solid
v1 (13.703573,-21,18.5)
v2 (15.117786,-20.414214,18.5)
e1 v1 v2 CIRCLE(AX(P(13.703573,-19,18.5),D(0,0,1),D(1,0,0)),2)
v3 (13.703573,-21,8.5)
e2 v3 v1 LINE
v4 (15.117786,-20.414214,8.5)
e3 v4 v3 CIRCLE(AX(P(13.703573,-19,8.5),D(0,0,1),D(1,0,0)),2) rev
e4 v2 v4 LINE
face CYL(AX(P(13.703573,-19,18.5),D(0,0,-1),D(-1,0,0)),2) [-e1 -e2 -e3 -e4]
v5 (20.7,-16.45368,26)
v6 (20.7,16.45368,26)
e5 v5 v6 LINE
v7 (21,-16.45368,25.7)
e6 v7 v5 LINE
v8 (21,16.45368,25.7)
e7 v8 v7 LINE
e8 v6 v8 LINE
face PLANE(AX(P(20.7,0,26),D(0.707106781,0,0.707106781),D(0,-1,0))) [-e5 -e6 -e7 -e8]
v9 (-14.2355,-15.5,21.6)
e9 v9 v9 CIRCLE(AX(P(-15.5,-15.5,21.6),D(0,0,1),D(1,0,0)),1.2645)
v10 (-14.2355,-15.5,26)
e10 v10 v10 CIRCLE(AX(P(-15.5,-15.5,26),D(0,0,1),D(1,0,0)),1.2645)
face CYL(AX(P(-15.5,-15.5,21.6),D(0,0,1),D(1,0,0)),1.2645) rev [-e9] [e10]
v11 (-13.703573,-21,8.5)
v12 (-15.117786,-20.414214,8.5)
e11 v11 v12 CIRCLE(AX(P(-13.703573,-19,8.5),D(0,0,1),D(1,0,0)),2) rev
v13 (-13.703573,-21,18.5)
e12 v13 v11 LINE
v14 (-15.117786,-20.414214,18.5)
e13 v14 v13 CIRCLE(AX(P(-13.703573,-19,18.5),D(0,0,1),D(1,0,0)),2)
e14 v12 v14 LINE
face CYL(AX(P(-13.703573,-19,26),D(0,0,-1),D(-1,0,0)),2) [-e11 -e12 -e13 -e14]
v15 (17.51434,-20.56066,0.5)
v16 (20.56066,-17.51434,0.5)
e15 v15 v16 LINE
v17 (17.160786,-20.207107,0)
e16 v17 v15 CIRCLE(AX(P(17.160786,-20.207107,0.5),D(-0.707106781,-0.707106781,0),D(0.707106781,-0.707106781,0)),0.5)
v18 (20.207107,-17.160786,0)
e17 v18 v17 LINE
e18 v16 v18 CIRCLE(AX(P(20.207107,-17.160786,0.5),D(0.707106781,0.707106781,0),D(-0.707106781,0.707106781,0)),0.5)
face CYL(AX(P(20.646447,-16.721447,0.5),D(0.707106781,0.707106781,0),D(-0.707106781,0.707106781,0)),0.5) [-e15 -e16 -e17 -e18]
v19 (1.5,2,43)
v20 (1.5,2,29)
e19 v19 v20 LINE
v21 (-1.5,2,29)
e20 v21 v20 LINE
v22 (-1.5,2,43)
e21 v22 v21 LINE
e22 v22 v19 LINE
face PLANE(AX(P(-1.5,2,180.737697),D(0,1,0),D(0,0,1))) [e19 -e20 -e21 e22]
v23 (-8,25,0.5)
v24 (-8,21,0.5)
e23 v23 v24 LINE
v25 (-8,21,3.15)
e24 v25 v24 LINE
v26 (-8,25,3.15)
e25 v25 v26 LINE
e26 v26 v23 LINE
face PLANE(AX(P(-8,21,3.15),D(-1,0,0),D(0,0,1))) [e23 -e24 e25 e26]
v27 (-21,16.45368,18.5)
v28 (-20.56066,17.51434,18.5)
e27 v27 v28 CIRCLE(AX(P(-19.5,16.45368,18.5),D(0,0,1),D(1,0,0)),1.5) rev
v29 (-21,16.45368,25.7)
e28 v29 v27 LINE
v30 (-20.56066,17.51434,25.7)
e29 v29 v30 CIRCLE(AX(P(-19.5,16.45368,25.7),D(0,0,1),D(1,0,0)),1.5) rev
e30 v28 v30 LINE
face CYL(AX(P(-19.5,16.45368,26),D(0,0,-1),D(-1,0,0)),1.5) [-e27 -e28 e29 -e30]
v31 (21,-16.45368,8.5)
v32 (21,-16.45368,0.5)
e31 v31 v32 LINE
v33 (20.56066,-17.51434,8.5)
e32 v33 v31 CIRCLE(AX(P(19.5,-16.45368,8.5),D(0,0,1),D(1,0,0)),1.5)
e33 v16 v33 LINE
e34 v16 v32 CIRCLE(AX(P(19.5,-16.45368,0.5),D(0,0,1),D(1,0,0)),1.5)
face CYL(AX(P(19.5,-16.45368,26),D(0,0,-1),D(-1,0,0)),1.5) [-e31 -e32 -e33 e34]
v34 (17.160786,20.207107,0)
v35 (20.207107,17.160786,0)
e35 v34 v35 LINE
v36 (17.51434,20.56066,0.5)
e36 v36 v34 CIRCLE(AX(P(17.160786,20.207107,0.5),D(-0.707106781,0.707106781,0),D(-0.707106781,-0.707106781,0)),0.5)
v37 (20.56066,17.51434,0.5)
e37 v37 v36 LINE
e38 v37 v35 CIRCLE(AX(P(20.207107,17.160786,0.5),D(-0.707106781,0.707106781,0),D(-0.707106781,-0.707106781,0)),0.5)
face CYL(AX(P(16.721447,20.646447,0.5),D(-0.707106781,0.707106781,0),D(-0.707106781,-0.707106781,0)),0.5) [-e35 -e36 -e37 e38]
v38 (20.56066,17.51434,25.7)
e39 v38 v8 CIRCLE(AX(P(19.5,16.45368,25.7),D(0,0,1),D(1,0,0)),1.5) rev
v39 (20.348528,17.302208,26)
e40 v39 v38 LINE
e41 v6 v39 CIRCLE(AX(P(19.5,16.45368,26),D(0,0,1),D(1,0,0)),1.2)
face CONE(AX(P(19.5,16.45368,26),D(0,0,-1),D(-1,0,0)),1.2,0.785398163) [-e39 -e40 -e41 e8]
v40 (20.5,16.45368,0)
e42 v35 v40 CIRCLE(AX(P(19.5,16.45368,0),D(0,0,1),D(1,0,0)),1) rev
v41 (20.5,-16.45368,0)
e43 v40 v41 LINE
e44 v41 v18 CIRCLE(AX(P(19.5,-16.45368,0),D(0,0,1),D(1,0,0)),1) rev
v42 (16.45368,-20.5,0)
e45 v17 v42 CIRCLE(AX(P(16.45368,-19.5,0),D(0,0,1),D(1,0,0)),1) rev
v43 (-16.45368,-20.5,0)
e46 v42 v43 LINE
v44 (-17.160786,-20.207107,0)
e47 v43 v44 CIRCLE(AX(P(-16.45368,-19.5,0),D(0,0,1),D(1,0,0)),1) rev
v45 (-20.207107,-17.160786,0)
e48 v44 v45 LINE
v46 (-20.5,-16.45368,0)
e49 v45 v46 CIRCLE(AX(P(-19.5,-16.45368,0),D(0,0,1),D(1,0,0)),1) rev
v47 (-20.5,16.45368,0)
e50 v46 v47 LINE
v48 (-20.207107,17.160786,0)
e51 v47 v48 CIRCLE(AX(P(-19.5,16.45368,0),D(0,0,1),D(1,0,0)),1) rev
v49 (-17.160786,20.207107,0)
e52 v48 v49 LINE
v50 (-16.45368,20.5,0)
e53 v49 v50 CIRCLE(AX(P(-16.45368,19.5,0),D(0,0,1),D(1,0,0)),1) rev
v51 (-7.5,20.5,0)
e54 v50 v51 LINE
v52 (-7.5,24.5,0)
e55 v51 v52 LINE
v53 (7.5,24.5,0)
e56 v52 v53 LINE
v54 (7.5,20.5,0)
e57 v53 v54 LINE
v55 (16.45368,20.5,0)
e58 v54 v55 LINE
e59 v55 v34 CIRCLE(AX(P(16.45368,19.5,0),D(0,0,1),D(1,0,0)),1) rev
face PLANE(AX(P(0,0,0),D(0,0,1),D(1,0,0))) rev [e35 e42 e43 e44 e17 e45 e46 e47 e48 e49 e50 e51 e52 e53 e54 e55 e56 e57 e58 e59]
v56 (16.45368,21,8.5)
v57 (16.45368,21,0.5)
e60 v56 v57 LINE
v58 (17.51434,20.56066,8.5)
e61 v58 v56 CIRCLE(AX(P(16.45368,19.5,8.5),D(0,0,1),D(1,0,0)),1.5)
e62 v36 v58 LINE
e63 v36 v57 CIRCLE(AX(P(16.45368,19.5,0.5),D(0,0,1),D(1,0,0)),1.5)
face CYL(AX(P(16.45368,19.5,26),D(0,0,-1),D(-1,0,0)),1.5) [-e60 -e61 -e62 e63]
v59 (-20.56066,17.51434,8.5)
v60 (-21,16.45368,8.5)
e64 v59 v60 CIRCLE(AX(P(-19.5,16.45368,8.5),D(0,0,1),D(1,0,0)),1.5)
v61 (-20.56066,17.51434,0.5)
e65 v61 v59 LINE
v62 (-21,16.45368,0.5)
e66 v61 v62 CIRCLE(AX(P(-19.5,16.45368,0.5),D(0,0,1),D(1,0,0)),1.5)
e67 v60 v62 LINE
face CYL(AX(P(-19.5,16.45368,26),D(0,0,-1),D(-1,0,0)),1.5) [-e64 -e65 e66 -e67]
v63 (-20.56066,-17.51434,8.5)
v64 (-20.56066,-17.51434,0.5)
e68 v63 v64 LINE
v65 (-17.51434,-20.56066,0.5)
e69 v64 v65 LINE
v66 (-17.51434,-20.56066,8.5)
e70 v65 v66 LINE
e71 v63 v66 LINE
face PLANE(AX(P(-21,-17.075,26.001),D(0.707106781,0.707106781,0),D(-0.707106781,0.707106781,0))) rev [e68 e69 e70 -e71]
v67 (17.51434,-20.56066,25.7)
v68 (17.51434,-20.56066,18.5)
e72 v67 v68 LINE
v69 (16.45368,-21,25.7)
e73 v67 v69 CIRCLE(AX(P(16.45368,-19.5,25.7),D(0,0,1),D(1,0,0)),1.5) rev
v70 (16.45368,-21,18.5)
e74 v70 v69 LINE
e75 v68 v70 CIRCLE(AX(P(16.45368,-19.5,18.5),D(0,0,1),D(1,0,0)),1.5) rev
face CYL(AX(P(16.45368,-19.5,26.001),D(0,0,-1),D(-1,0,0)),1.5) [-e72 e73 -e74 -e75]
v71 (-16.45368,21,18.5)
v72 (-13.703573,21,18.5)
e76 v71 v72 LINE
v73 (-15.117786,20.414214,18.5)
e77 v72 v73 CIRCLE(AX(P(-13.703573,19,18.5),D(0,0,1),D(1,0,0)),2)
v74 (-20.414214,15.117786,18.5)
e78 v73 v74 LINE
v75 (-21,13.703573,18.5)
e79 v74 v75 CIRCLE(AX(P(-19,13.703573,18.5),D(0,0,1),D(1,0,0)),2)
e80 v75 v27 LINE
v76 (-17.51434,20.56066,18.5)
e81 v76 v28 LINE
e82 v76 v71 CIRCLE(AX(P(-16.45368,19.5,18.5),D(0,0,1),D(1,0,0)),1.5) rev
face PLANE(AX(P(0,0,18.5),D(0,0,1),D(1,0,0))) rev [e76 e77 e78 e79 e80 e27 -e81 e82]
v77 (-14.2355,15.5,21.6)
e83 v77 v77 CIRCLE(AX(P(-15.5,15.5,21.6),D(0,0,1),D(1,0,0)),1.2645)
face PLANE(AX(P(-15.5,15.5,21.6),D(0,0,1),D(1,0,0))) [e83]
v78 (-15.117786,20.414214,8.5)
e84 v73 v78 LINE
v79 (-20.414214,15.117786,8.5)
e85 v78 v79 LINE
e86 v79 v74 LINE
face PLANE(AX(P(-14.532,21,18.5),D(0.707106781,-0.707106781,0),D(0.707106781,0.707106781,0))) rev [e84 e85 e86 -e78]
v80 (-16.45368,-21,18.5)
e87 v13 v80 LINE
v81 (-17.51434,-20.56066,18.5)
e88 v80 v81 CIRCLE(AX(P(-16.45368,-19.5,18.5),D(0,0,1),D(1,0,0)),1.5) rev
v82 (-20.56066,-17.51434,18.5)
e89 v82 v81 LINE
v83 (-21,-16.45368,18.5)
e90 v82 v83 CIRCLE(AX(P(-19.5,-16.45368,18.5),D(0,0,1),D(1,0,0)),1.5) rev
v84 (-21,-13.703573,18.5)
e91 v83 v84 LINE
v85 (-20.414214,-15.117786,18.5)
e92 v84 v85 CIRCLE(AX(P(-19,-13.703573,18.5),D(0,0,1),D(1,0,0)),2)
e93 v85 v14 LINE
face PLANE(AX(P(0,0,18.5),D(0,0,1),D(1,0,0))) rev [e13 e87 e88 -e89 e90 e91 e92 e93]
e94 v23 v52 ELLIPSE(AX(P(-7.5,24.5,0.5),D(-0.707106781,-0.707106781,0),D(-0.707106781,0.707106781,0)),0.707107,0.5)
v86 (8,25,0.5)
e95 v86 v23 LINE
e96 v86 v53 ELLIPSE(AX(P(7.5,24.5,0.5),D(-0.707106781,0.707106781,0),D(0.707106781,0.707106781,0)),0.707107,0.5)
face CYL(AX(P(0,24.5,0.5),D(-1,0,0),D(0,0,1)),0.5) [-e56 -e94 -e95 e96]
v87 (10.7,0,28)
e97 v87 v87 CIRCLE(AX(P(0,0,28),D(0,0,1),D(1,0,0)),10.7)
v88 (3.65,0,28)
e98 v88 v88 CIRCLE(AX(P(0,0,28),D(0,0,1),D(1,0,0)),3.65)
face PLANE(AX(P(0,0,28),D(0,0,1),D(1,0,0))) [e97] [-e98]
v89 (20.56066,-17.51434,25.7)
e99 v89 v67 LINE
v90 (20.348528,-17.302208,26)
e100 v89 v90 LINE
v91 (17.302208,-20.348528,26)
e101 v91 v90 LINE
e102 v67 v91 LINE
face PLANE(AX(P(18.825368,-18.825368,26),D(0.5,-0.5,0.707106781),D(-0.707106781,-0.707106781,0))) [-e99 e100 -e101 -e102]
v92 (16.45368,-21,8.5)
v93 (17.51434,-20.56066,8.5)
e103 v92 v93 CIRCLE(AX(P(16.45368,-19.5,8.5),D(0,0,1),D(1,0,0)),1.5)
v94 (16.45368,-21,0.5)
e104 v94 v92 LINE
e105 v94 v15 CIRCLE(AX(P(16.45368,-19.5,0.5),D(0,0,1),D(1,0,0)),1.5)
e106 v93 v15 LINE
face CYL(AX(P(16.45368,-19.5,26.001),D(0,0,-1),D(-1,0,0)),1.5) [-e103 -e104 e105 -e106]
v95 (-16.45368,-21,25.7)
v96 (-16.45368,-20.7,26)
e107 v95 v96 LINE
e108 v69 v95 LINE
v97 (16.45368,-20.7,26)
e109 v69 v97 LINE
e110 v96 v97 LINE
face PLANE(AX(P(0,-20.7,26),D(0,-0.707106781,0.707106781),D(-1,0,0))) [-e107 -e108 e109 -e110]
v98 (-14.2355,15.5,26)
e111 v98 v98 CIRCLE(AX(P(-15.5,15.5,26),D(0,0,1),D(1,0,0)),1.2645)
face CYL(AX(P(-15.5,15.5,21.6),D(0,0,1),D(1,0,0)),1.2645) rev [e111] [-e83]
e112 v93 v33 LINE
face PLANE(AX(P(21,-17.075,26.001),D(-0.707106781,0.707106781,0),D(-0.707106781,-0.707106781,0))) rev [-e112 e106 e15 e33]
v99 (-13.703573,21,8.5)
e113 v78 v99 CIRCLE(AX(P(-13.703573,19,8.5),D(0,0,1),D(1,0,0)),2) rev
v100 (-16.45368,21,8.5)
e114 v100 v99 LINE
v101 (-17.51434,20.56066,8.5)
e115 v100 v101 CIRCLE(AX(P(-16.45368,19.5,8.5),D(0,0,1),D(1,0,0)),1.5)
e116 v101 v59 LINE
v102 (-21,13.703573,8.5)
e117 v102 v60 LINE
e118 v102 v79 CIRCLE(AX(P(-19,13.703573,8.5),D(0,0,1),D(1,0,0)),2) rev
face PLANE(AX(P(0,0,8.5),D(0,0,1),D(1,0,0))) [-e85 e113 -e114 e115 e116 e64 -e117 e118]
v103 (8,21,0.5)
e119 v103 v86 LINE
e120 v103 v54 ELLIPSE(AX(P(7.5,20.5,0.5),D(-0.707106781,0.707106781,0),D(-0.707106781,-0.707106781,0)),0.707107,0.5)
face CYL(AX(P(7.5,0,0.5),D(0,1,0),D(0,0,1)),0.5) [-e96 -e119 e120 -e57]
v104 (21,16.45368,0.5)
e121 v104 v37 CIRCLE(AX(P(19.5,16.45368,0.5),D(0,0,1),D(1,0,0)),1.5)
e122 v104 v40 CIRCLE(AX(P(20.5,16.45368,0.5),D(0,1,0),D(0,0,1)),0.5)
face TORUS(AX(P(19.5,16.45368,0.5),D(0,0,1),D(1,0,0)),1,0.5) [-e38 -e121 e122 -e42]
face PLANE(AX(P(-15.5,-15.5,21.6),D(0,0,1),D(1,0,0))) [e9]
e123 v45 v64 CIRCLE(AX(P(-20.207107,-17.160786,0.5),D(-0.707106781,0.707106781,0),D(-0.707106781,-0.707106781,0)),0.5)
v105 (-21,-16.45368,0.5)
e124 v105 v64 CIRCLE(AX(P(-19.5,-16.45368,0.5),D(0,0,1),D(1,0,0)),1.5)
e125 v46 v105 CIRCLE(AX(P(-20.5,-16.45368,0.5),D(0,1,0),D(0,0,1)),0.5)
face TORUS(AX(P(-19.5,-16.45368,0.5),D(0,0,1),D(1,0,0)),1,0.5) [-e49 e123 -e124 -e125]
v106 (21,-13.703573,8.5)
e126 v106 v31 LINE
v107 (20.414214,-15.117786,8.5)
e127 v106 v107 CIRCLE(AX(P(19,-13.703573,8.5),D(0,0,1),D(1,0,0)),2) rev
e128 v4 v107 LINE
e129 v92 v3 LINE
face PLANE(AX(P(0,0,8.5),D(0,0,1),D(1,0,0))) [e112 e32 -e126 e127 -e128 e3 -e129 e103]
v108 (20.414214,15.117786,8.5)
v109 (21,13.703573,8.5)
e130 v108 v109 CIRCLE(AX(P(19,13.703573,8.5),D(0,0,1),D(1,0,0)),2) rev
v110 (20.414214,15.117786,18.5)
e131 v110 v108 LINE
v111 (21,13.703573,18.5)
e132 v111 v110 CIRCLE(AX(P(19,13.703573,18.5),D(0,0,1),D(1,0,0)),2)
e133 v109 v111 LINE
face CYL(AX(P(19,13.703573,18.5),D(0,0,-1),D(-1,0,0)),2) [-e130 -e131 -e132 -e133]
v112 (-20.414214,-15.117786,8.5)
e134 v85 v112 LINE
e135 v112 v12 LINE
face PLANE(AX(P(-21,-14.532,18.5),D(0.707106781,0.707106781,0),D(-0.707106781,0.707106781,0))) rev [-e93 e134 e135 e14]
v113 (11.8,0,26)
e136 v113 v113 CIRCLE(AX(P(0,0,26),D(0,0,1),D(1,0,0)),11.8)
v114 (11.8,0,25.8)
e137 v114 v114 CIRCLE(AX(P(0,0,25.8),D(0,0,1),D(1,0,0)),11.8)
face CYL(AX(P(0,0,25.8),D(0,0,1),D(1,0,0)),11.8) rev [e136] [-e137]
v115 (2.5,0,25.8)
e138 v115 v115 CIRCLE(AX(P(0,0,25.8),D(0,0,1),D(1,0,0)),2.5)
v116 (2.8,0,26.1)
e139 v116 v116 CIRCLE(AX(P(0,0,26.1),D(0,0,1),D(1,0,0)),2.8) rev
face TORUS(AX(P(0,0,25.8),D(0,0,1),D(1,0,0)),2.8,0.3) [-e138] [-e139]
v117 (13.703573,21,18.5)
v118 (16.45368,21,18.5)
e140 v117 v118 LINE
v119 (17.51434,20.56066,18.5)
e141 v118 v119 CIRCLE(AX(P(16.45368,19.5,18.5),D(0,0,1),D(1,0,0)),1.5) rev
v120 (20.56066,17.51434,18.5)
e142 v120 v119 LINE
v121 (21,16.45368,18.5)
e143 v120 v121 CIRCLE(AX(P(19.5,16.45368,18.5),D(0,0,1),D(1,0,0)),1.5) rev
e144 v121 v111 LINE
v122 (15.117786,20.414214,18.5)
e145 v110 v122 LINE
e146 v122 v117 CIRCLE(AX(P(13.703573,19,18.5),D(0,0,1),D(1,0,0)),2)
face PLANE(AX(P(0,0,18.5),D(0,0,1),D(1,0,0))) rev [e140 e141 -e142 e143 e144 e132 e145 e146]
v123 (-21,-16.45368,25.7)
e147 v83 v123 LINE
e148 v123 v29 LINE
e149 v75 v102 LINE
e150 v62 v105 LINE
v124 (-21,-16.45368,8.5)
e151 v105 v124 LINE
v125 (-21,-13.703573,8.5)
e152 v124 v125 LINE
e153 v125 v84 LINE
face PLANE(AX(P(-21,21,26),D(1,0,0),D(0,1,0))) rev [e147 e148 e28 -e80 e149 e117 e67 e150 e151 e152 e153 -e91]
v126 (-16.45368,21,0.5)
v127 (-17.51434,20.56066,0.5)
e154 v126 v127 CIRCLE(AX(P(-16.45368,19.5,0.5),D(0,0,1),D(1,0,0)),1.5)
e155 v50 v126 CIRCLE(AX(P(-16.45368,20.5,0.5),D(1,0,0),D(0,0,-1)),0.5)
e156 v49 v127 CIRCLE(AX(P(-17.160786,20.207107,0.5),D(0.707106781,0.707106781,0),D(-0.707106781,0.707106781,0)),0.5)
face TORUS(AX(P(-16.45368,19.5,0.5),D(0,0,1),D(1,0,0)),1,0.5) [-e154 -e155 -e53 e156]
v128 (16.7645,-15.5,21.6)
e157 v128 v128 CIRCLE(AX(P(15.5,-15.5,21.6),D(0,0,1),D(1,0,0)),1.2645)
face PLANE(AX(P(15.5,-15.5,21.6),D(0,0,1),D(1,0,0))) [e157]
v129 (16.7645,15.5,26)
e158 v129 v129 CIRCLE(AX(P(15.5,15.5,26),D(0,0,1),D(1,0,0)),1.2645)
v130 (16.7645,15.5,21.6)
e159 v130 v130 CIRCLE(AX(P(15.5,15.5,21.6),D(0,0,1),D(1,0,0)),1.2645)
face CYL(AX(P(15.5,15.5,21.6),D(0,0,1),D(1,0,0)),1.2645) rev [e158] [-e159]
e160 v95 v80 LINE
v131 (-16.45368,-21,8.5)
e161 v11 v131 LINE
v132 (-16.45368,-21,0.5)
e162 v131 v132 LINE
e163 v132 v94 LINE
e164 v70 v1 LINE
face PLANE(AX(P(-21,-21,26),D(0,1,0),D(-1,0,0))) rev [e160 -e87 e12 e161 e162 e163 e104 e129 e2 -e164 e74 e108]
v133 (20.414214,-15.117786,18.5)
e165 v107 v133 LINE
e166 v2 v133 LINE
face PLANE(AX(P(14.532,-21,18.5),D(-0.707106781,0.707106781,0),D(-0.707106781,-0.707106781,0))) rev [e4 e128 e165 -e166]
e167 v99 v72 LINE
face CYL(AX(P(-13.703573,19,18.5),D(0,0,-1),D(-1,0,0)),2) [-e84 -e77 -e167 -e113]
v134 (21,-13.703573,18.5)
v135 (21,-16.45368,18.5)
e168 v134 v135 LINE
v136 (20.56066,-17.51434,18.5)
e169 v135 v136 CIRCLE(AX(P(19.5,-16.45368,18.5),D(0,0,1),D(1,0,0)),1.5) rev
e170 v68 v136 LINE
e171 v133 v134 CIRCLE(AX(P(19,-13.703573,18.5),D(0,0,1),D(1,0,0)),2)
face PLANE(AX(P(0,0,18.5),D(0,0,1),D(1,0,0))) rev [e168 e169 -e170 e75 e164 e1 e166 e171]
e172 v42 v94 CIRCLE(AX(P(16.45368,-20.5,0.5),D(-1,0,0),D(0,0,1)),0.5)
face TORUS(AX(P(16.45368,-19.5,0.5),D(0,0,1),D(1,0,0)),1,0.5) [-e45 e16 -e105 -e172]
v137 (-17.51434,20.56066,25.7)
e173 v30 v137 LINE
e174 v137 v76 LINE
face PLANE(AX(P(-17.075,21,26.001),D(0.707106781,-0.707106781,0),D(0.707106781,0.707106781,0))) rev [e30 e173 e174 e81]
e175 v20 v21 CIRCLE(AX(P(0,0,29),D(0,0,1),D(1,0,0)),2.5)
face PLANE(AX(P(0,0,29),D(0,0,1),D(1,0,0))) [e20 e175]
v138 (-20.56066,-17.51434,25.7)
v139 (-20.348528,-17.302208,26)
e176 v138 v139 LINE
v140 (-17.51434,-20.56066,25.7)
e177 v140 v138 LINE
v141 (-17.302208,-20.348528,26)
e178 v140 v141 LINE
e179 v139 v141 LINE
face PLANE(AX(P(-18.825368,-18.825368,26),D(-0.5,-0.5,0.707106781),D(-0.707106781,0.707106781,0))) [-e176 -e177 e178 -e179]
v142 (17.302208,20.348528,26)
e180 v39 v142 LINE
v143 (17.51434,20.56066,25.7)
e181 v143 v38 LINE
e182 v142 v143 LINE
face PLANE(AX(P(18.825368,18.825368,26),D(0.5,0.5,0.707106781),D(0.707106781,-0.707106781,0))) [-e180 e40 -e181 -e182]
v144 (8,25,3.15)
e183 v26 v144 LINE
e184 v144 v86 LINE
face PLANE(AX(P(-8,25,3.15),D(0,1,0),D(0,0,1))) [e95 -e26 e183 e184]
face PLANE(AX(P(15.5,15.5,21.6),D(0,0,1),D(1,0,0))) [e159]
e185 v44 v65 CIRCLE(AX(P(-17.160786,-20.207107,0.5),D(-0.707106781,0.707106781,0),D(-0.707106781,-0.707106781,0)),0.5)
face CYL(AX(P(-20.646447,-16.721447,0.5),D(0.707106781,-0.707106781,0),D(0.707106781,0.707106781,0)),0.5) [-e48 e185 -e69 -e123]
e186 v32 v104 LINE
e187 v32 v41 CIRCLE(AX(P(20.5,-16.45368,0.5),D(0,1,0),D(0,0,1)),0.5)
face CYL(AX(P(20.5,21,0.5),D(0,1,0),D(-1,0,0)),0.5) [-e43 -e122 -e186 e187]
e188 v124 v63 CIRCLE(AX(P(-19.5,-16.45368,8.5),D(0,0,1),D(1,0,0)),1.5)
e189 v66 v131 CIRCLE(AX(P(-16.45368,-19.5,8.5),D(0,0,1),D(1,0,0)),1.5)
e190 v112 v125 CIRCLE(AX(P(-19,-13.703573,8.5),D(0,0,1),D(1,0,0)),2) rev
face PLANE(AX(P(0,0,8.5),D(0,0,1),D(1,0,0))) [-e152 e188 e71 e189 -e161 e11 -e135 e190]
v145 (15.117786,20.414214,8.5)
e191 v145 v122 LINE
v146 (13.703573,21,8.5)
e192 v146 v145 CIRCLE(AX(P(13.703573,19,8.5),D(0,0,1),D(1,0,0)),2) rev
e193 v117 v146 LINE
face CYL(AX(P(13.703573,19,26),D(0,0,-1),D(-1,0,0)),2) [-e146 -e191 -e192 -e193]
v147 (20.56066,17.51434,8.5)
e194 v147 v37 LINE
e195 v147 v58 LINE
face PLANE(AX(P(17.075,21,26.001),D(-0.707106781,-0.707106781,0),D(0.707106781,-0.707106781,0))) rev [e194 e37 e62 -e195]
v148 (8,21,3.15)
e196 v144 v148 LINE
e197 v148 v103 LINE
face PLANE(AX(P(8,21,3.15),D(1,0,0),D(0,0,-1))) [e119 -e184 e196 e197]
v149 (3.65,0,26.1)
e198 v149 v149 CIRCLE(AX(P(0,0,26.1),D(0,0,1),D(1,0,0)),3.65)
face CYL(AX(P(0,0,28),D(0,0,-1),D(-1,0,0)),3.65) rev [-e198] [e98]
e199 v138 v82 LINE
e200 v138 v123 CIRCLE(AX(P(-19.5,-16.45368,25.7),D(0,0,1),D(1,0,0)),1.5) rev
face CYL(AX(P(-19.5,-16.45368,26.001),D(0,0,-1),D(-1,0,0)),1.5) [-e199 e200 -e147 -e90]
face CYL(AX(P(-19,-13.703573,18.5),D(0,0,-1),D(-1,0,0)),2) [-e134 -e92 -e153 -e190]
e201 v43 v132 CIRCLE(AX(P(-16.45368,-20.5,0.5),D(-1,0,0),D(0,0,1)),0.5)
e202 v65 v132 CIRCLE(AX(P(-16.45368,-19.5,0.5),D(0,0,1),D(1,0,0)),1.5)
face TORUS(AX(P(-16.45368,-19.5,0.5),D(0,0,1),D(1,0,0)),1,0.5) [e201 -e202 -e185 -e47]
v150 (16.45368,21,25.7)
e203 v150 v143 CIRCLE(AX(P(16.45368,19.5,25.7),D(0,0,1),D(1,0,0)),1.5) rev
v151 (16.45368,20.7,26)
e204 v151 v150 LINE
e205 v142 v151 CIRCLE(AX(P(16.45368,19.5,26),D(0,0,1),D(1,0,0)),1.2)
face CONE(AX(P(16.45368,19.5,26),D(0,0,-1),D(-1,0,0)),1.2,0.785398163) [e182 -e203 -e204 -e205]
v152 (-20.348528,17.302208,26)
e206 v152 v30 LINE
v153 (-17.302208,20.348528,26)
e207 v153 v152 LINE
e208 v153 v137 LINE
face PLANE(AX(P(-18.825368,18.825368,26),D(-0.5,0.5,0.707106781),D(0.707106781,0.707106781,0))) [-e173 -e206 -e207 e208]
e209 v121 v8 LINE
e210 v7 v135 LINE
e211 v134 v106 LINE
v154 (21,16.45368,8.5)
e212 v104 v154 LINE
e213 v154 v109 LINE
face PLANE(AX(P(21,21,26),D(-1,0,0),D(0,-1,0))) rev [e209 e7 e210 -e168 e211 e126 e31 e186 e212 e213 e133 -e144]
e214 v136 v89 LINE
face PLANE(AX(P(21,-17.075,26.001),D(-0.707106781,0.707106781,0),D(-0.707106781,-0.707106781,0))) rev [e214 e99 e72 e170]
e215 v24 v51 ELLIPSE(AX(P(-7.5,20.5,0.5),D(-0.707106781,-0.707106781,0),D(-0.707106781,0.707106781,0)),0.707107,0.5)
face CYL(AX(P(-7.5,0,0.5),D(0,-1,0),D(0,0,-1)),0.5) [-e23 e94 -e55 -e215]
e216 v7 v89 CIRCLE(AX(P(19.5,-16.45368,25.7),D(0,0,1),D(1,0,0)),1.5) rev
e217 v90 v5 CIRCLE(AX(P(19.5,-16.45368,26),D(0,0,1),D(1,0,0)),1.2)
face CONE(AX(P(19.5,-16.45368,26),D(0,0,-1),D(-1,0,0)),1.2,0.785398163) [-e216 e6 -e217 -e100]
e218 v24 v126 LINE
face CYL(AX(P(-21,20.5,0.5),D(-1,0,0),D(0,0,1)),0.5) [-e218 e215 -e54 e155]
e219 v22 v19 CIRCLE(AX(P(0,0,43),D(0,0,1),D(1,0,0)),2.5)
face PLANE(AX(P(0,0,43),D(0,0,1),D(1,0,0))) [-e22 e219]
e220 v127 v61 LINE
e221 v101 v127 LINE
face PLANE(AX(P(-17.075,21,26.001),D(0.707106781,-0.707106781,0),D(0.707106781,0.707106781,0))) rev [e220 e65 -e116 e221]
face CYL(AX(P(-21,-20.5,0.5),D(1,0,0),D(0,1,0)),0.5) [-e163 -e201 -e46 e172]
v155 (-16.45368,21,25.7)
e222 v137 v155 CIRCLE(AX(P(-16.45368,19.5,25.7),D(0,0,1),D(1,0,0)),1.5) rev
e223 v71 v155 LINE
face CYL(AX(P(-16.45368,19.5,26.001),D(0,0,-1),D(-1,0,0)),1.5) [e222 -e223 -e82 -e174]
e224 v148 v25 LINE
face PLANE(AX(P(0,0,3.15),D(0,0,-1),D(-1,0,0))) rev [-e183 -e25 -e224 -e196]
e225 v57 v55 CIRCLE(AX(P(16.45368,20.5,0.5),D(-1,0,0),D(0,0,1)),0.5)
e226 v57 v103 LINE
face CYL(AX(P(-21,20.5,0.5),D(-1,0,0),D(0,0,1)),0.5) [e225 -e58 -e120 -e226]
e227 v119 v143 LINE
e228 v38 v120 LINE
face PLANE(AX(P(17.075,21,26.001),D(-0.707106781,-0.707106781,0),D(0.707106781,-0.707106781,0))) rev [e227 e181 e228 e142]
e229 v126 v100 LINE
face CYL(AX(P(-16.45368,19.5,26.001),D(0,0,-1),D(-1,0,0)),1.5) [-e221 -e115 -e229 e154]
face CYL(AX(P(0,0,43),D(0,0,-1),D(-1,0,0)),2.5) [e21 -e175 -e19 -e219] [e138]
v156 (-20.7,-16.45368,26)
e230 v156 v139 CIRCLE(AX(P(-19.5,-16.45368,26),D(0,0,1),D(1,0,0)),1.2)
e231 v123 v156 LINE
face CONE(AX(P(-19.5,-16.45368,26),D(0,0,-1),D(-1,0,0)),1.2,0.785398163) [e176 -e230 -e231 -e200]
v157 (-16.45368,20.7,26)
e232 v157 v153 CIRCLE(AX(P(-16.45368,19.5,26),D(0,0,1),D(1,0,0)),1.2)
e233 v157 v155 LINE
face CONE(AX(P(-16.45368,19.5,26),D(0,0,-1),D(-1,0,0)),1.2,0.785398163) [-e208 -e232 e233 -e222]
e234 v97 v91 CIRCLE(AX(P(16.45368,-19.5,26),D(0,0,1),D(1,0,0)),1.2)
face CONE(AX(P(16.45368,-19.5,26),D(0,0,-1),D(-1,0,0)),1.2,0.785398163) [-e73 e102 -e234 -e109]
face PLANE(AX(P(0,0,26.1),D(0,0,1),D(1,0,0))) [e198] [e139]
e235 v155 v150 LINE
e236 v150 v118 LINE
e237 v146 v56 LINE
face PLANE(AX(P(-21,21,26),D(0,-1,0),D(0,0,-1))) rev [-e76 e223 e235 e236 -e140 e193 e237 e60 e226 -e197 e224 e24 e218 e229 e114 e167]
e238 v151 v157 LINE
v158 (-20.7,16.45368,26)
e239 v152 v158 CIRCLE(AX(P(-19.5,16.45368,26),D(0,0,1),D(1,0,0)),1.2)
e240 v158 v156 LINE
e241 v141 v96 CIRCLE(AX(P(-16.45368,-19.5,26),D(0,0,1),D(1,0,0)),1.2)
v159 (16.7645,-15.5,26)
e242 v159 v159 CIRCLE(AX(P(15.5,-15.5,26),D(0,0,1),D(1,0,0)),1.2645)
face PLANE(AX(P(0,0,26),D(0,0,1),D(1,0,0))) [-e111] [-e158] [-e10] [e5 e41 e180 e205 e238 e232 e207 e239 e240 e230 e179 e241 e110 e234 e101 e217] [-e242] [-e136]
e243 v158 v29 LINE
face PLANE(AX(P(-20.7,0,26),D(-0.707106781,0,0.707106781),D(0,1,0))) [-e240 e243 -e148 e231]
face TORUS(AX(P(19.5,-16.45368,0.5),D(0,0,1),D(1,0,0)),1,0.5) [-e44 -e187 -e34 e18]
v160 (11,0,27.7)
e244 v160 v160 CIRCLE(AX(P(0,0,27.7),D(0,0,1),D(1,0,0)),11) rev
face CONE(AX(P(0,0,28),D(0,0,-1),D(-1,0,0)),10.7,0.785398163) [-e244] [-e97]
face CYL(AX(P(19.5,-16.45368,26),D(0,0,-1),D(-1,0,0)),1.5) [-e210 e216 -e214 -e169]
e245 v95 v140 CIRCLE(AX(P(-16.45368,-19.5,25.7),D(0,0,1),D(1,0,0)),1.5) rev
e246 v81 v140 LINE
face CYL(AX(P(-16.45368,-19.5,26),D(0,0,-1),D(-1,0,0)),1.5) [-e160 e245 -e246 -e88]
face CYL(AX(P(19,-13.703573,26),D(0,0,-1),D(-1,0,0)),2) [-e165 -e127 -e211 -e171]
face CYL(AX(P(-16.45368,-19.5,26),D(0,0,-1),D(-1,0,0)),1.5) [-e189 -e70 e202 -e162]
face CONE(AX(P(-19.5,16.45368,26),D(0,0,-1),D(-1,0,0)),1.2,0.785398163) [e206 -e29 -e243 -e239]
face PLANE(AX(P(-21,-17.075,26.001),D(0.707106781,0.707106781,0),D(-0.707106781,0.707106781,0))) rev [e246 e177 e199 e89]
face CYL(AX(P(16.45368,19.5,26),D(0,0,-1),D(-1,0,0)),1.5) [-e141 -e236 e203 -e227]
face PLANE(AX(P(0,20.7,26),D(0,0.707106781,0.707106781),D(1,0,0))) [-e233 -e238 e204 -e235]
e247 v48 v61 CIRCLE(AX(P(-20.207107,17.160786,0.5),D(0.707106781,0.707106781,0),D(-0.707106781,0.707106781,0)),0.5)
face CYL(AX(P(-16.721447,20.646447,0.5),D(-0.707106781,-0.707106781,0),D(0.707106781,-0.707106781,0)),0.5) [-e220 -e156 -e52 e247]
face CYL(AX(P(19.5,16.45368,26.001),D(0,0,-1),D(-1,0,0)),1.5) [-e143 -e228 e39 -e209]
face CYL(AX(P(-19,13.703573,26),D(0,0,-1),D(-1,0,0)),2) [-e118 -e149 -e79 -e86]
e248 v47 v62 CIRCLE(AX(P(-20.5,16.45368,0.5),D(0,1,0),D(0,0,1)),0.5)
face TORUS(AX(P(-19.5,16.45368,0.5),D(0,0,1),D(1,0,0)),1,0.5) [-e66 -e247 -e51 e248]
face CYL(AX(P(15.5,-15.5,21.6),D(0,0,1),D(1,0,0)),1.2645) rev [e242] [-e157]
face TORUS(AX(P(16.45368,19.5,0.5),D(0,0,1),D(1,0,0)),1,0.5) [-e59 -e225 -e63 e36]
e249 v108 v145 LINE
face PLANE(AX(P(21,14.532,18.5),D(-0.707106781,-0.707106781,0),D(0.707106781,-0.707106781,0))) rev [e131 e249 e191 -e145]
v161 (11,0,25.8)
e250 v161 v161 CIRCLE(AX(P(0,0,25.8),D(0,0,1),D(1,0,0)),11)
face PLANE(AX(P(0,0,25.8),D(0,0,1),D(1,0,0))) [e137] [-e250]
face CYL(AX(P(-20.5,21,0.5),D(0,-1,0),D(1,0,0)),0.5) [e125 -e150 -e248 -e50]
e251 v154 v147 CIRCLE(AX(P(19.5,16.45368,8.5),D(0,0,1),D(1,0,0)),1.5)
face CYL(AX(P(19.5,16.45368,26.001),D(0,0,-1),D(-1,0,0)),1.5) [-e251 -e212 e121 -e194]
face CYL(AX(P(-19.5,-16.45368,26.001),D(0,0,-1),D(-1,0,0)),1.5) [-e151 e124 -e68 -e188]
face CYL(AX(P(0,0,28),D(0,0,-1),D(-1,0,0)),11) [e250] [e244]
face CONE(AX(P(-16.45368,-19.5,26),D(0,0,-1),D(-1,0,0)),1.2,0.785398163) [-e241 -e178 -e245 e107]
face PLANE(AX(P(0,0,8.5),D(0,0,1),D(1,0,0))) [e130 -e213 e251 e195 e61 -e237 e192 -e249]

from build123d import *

# Parameters (mm, degrees)
SKETCH_1_W               = 42
SKETCH_1_H               = 42
EXTRUDE_1_DEPTH          = 26
SKETCH_2_W               = 16
SKETCH_2_H               = 4
EXTRUDE_2_DEPTH          = 3.15
CUT_EXTRUDE_1_REACH      = 43.737
CUT_EXTRUDE_START        = -8.5
CUT_EXTRUDE_2_DEPTH      = 10
FILLET_2_R               = 1.5
FILLET_3_R               = 2
SKETCH_10_R              = 11.8
CUT_EXTRUDE_5_DEPTH      = 0.2
SKETCH_11_R              = 11
SKETCH_11_R_2            = 3.65
EXTRUDE_7_DEPTH          = 2.2
SKETCH_12_R              = 3.65
SKETCH_12_R_2            = 2.5
EXTRUDE_8_DEPTH          = 0.3
FILLET_4_R               = 0.3
SKETCH_13_R              = 2.5
EXTRUDE_9_DEPTH          = 17.2
CUT_EXTRUDE_6_DEPTH      = 54.990739947
CUT_EXTRUDE_6_DEPTH_BACK = 14
SKETCH_15_R              = 1.2645
CUT_EXTRUDE_7_DEPTH      = 4.4
CHAMFER_4_SIZE           = 0.3
CHAMFER_5_SIZE           = 0.3
FILLET_5_R               = 0.5


with BuildPart() as part:
    # 草图1 → 凸台-拉伸1 (new body)
    with BuildSketch(Plane.XY):
        Rectangle(SKETCH_1_W, SKETCH_1_H)
    extrude(amount=EXTRUDE_1_DEPTH)

    # 草图2 → 凸台-拉伸2 (add)
    with BuildSketch(Plane(origin=(0, 0, 0), x_dir=(-1, 0, 0), z_dir=(0, 0, -1))):
        with Locations((0, 23)):
            Rectangle(SKETCH_2_W, SKETCH_2_H)
    extrude(amount=-EXTRUDE_2_DEPTH)

    # 草图3 → 切除-拉伸1 (cut, up to next)
    with BuildSketch(Plane(origin=(0, 0, 0), x_dir=(-1, 0, 0), z_dir=(0, 0, -1)), mode=Mode.PRIVATE) as cut_extrude_1_sk1:
        Polygon((-17.075, 21), (-21, 17.075), (-21, 21), align=None)
    cut_extrude_1_tool1 = extrude(cut_extrude_1_sk1.sketch, amount=-CUT_EXTRUDE_1_REACH, mode=Mode.PRIVATE) & part.part
    # 草图3 → 切除-拉伸1 (cut, up to next)
    with BuildSketch(Plane(origin=(0, 0, 0), x_dir=(-1, 0, 0), z_dir=(0, 0, -1)), mode=Mode.PRIVATE) as cut_extrude_1_sk2:
        Polygon((17.075, 21), (21, 17.075), (21, 21), align=None)
    cut_extrude_1_tool2 = extrude(cut_extrude_1_sk2.sketch, amount=-CUT_EXTRUDE_1_REACH, mode=Mode.PRIVATE) & part.part
    # 草图3 → 切除-拉伸1 (cut, up to next)
    with BuildSketch(Plane(origin=(0, 0, 0), x_dir=(-1, 0, 0), z_dir=(0, 0, -1)), mode=Mode.PRIVATE) as cut_extrude_1_sk3:
        Polygon((21, -17.075), (17.075, -21), (21, -21), align=None)
    cut_extrude_1_tool3 = extrude(cut_extrude_1_sk3.sketch, amount=-CUT_EXTRUDE_1_REACH, mode=Mode.PRIVATE) & part.part
    # 草图3 → 切除-拉伸1 (cut, up to next)
    with BuildSketch(Plane(origin=(0, 0, 0), x_dir=(-1, 0, 0), z_dir=(0, 0, -1)), mode=Mode.PRIVATE) as cut_extrude_1_sk4:
        Polygon((-21, -17.075), (-17.075, -21), (-21, -21), align=None)
    cut_extrude_1_tool4 = extrude(cut_extrude_1_sk4.sketch, amount=-CUT_EXTRUDE_1_REACH, mode=Mode.PRIVATE) & part.part
    add(cut_extrude_1_tool1.solids().sort_by_distance((19.691667, 19.691667, 0))[0], mode=Mode.SUBTRACT)
    add(cut_extrude_1_tool2.solids().sort_by_distance((-19.691667, 19.691667, 0))[0], mode=Mode.SUBTRACT)
    add(cut_extrude_1_tool3.solids().sort_by_distance((-19.691667, -19.691667, 0))[0], mode=Mode.SUBTRACT)
    add(cut_extrude_1_tool4.solids().sort_by_distance((19.691667, -19.691667, 0))[0], mode=Mode.SUBTRACT)

    # 草图4 → 切除-拉伸2 (cut)
    with BuildSketch(Plane(origin=(0, 0, 0), x_dir=(-1, 0, 0), z_dir=(0, 0, -1)).offset(CUT_EXTRUDE_START)):
        Polygon((-21, 14.532), (-14.532, 21), (-21, 21), align=None)
        Polygon((14.532, 21), (21, 14.532), (21, 21), align=None)
        Polygon((21, -14.532), (14.532, -21), (21, -21), align=None)
        Polygon((-14.532, -21), (-21, -14.532), (-21, -21), align=None)
    extrude(amount=-CUT_EXTRUDE_2_DEPTH, mode=Mode.SUBTRACT)

    # 圆角2
    fillet_2_edges = [part.edges().sort_by_distance(p)[0] for p in [
        (21, -17.075, 22.25),
        (17.075, -21, 22.25),
        (-21, -17.075, 22.25),
        (-17.075, -21, 22.25),
        (-17.075, 21, 22.25),
        (-21, 17.075, 22.25),
        (17.075, 21, 22.25),
        (21, 17.075, 22.25),
        (17.075, -21, 4.25),
        (21, -17.075, 4.25),
        (-21, -17.075, 4.25),
        (-17.075, -21, 4.25),
        (-17.075, 21, 4.25),
        (-21, 17.075, 4.25),
        (21, 17.075, 4.25),
        (17.075, 21, 4.25),
    ]]
    fillet(fillet_2_edges, radius=FILLET_2_R)

    # 圆角3
    fillet_3_edges = [part.edges().sort_by_distance(p)[0] for p in [
        (-21, -14.532, 13.5),
        (-14.532, -21, 13.5),
        (-14.532, 21, 13.5),
        (-21, 14.532, 13.5),
        (21, 14.532, 13.5),
        (14.532, 21, 13.5),
        (14.532, -21, 13.5),
        (21, -14.532, 13.5),
    ]]
    fillet(fillet_3_edges, radius=FILLET_3_R)

    # 草图10 → 切除-拉伸5 (cut)
    with BuildSketch(Plane.XY.offset(26)):
        Circle(SKETCH_10_R)
    extrude(amount=-CUT_EXTRUDE_5_DEPTH, mode=Mode.SUBTRACT)

    # 草图11 → 凸台-拉伸7 (add)
    with BuildSketch(Plane.XY.offset(25.8)):
        Circle(SKETCH_11_R)
        Circle(SKETCH_11_R_2, mode=Mode.SUBTRACT)
    extrude(amount=EXTRUDE_7_DEPTH)

    # 草图12 → 凸台-拉伸8 (add)
    with BuildSketch(Plane.XY.offset(25.8)):
        Circle(SKETCH_12_R)
        Circle(SKETCH_12_R_2, mode=Mode.SUBTRACT)
    extrude(amount=EXTRUDE_8_DEPTH)

    # 圆角4
    fillet_4_edges = [part.edges().sort_by_distance(p)[0] for p in [
        (-2.5, 0, 26.1),
    ]]
    fillet(fillet_4_edges, radius=FILLET_4_R - 0.0001)  # a hair under: the kernel refuses the full size

    # 草图13 → 凸台-拉伸9 (add)
    with BuildSketch(Plane.XY.offset(25.8)):
        with Locations(Location((0, 0, 0), (0, 0, 180))):
            Circle(SKETCH_13_R)
    extrude(amount=EXTRUDE_9_DEPTH)

    # 草图14 → 切除-拉伸6 (cut, two sides: drawn at the far end of the back side and taken through both)
    with BuildSketch(Plane.XY.offset(43).offset(-CUT_EXTRUDE_6_DEPTH_BACK)):
        Polygon((-75.850602173, 2), (-1.5, 2), (1.5, 2), (75.850602173, 2), (75.850602173, 150.701204346), (-75.850602173, 150.701204346), align=None)
    extrude(amount=CUT_EXTRUDE_6_DEPTH + CUT_EXTRUDE_6_DEPTH_BACK, mode=Mode.SUBTRACT)

    # 草图15 → 切除-拉伸7 (cut)
    with BuildSketch(Plane.XY.offset(26)):
        with Locations((-15.5, 15.5)):
            Circle(SKETCH_15_R)
        with Locations((15.5, 15.5)):
            Circle(SKETCH_15_R)
        with Locations((15.5, -15.5)):
            Circle(SKETCH_15_R)
        with Locations((-15.5, -15.5)):
            Circle(SKETCH_15_R)
    extrude(amount=-CUT_EXTRUDE_7_DEPTH, mode=Mode.SUBTRACT)

    # 倒角4
    chamfer_4_edges = [part.edges().sort_by_distance(p)[0] for p in [
        (-11, 0, 28),
    ]]
    chamfer(chamfer_4_edges, length=CHAMFER_4_SIZE)

    # 倒角5
    chamfer_5_edges = [part.edges().sort_by_distance(p)[0] for p in [
        (-19.0375, -19.0375, 26),
        (-21, 0, 26),
        (19.0375, -19.0375, 26),
        (21, 0, 26),
        (19.0375, 19.0375, 26),
        (0, 21, 26),
        (-19.0375, 19.0375, 26),
        (0, -21, 26),
        (17.027704805, 20.885819299, 26),
        (20.885819299, 17.027704805, 26),
        (20.885819299, -17.027704805, 26),
        (17.027704805, -20.885819299, 26),
        (-17.027704805, 20.885819299, 26),
        (-20.885819299, 17.027704805, 26),
        (-17.027704805, -20.885819299, 26),
        (-20.885819299, -17.027704805, 26),
    ]]
    chamfer(chamfer_5_edges, length=CHAMFER_5_SIZE)

    # 圆角5
    fillet_5_edges = [part.edges().sort_by_distance(p)[0] for p in [
        (-21, 0, 0),
        (-12.226839828, 21, 0),
        (0, -21, 0),
        (21, 0, 0),
        (19.0375, -19.0375, 0),
        (-19.0375, -19.0375, 0),
        (-19.0375, 19.0375, 0),
        (12.226839828, 21, 0),
        (19.0375, 19.0375, 0),
        (17.027704805, 20.885819299, 0),
        (20.885819299, 17.027704805, 0),
        (20.885819299, -17.027704805, 0),
        (17.027704805, -20.885819299, 0),
        (-20.885819299, 17.027704805, 0),
        (-17.027704805, 20.885819299, 0),
        (-20.885819299, -17.027704805, 0),
        (-17.027704805, -20.885819299, 0),
        (-8, 23, 0),
        (0, 25, 0),
        (8, 23, 0),
    ]]
    fillet(fillet_5_edges, radius=FILLET_5_R)


solid = part.part
